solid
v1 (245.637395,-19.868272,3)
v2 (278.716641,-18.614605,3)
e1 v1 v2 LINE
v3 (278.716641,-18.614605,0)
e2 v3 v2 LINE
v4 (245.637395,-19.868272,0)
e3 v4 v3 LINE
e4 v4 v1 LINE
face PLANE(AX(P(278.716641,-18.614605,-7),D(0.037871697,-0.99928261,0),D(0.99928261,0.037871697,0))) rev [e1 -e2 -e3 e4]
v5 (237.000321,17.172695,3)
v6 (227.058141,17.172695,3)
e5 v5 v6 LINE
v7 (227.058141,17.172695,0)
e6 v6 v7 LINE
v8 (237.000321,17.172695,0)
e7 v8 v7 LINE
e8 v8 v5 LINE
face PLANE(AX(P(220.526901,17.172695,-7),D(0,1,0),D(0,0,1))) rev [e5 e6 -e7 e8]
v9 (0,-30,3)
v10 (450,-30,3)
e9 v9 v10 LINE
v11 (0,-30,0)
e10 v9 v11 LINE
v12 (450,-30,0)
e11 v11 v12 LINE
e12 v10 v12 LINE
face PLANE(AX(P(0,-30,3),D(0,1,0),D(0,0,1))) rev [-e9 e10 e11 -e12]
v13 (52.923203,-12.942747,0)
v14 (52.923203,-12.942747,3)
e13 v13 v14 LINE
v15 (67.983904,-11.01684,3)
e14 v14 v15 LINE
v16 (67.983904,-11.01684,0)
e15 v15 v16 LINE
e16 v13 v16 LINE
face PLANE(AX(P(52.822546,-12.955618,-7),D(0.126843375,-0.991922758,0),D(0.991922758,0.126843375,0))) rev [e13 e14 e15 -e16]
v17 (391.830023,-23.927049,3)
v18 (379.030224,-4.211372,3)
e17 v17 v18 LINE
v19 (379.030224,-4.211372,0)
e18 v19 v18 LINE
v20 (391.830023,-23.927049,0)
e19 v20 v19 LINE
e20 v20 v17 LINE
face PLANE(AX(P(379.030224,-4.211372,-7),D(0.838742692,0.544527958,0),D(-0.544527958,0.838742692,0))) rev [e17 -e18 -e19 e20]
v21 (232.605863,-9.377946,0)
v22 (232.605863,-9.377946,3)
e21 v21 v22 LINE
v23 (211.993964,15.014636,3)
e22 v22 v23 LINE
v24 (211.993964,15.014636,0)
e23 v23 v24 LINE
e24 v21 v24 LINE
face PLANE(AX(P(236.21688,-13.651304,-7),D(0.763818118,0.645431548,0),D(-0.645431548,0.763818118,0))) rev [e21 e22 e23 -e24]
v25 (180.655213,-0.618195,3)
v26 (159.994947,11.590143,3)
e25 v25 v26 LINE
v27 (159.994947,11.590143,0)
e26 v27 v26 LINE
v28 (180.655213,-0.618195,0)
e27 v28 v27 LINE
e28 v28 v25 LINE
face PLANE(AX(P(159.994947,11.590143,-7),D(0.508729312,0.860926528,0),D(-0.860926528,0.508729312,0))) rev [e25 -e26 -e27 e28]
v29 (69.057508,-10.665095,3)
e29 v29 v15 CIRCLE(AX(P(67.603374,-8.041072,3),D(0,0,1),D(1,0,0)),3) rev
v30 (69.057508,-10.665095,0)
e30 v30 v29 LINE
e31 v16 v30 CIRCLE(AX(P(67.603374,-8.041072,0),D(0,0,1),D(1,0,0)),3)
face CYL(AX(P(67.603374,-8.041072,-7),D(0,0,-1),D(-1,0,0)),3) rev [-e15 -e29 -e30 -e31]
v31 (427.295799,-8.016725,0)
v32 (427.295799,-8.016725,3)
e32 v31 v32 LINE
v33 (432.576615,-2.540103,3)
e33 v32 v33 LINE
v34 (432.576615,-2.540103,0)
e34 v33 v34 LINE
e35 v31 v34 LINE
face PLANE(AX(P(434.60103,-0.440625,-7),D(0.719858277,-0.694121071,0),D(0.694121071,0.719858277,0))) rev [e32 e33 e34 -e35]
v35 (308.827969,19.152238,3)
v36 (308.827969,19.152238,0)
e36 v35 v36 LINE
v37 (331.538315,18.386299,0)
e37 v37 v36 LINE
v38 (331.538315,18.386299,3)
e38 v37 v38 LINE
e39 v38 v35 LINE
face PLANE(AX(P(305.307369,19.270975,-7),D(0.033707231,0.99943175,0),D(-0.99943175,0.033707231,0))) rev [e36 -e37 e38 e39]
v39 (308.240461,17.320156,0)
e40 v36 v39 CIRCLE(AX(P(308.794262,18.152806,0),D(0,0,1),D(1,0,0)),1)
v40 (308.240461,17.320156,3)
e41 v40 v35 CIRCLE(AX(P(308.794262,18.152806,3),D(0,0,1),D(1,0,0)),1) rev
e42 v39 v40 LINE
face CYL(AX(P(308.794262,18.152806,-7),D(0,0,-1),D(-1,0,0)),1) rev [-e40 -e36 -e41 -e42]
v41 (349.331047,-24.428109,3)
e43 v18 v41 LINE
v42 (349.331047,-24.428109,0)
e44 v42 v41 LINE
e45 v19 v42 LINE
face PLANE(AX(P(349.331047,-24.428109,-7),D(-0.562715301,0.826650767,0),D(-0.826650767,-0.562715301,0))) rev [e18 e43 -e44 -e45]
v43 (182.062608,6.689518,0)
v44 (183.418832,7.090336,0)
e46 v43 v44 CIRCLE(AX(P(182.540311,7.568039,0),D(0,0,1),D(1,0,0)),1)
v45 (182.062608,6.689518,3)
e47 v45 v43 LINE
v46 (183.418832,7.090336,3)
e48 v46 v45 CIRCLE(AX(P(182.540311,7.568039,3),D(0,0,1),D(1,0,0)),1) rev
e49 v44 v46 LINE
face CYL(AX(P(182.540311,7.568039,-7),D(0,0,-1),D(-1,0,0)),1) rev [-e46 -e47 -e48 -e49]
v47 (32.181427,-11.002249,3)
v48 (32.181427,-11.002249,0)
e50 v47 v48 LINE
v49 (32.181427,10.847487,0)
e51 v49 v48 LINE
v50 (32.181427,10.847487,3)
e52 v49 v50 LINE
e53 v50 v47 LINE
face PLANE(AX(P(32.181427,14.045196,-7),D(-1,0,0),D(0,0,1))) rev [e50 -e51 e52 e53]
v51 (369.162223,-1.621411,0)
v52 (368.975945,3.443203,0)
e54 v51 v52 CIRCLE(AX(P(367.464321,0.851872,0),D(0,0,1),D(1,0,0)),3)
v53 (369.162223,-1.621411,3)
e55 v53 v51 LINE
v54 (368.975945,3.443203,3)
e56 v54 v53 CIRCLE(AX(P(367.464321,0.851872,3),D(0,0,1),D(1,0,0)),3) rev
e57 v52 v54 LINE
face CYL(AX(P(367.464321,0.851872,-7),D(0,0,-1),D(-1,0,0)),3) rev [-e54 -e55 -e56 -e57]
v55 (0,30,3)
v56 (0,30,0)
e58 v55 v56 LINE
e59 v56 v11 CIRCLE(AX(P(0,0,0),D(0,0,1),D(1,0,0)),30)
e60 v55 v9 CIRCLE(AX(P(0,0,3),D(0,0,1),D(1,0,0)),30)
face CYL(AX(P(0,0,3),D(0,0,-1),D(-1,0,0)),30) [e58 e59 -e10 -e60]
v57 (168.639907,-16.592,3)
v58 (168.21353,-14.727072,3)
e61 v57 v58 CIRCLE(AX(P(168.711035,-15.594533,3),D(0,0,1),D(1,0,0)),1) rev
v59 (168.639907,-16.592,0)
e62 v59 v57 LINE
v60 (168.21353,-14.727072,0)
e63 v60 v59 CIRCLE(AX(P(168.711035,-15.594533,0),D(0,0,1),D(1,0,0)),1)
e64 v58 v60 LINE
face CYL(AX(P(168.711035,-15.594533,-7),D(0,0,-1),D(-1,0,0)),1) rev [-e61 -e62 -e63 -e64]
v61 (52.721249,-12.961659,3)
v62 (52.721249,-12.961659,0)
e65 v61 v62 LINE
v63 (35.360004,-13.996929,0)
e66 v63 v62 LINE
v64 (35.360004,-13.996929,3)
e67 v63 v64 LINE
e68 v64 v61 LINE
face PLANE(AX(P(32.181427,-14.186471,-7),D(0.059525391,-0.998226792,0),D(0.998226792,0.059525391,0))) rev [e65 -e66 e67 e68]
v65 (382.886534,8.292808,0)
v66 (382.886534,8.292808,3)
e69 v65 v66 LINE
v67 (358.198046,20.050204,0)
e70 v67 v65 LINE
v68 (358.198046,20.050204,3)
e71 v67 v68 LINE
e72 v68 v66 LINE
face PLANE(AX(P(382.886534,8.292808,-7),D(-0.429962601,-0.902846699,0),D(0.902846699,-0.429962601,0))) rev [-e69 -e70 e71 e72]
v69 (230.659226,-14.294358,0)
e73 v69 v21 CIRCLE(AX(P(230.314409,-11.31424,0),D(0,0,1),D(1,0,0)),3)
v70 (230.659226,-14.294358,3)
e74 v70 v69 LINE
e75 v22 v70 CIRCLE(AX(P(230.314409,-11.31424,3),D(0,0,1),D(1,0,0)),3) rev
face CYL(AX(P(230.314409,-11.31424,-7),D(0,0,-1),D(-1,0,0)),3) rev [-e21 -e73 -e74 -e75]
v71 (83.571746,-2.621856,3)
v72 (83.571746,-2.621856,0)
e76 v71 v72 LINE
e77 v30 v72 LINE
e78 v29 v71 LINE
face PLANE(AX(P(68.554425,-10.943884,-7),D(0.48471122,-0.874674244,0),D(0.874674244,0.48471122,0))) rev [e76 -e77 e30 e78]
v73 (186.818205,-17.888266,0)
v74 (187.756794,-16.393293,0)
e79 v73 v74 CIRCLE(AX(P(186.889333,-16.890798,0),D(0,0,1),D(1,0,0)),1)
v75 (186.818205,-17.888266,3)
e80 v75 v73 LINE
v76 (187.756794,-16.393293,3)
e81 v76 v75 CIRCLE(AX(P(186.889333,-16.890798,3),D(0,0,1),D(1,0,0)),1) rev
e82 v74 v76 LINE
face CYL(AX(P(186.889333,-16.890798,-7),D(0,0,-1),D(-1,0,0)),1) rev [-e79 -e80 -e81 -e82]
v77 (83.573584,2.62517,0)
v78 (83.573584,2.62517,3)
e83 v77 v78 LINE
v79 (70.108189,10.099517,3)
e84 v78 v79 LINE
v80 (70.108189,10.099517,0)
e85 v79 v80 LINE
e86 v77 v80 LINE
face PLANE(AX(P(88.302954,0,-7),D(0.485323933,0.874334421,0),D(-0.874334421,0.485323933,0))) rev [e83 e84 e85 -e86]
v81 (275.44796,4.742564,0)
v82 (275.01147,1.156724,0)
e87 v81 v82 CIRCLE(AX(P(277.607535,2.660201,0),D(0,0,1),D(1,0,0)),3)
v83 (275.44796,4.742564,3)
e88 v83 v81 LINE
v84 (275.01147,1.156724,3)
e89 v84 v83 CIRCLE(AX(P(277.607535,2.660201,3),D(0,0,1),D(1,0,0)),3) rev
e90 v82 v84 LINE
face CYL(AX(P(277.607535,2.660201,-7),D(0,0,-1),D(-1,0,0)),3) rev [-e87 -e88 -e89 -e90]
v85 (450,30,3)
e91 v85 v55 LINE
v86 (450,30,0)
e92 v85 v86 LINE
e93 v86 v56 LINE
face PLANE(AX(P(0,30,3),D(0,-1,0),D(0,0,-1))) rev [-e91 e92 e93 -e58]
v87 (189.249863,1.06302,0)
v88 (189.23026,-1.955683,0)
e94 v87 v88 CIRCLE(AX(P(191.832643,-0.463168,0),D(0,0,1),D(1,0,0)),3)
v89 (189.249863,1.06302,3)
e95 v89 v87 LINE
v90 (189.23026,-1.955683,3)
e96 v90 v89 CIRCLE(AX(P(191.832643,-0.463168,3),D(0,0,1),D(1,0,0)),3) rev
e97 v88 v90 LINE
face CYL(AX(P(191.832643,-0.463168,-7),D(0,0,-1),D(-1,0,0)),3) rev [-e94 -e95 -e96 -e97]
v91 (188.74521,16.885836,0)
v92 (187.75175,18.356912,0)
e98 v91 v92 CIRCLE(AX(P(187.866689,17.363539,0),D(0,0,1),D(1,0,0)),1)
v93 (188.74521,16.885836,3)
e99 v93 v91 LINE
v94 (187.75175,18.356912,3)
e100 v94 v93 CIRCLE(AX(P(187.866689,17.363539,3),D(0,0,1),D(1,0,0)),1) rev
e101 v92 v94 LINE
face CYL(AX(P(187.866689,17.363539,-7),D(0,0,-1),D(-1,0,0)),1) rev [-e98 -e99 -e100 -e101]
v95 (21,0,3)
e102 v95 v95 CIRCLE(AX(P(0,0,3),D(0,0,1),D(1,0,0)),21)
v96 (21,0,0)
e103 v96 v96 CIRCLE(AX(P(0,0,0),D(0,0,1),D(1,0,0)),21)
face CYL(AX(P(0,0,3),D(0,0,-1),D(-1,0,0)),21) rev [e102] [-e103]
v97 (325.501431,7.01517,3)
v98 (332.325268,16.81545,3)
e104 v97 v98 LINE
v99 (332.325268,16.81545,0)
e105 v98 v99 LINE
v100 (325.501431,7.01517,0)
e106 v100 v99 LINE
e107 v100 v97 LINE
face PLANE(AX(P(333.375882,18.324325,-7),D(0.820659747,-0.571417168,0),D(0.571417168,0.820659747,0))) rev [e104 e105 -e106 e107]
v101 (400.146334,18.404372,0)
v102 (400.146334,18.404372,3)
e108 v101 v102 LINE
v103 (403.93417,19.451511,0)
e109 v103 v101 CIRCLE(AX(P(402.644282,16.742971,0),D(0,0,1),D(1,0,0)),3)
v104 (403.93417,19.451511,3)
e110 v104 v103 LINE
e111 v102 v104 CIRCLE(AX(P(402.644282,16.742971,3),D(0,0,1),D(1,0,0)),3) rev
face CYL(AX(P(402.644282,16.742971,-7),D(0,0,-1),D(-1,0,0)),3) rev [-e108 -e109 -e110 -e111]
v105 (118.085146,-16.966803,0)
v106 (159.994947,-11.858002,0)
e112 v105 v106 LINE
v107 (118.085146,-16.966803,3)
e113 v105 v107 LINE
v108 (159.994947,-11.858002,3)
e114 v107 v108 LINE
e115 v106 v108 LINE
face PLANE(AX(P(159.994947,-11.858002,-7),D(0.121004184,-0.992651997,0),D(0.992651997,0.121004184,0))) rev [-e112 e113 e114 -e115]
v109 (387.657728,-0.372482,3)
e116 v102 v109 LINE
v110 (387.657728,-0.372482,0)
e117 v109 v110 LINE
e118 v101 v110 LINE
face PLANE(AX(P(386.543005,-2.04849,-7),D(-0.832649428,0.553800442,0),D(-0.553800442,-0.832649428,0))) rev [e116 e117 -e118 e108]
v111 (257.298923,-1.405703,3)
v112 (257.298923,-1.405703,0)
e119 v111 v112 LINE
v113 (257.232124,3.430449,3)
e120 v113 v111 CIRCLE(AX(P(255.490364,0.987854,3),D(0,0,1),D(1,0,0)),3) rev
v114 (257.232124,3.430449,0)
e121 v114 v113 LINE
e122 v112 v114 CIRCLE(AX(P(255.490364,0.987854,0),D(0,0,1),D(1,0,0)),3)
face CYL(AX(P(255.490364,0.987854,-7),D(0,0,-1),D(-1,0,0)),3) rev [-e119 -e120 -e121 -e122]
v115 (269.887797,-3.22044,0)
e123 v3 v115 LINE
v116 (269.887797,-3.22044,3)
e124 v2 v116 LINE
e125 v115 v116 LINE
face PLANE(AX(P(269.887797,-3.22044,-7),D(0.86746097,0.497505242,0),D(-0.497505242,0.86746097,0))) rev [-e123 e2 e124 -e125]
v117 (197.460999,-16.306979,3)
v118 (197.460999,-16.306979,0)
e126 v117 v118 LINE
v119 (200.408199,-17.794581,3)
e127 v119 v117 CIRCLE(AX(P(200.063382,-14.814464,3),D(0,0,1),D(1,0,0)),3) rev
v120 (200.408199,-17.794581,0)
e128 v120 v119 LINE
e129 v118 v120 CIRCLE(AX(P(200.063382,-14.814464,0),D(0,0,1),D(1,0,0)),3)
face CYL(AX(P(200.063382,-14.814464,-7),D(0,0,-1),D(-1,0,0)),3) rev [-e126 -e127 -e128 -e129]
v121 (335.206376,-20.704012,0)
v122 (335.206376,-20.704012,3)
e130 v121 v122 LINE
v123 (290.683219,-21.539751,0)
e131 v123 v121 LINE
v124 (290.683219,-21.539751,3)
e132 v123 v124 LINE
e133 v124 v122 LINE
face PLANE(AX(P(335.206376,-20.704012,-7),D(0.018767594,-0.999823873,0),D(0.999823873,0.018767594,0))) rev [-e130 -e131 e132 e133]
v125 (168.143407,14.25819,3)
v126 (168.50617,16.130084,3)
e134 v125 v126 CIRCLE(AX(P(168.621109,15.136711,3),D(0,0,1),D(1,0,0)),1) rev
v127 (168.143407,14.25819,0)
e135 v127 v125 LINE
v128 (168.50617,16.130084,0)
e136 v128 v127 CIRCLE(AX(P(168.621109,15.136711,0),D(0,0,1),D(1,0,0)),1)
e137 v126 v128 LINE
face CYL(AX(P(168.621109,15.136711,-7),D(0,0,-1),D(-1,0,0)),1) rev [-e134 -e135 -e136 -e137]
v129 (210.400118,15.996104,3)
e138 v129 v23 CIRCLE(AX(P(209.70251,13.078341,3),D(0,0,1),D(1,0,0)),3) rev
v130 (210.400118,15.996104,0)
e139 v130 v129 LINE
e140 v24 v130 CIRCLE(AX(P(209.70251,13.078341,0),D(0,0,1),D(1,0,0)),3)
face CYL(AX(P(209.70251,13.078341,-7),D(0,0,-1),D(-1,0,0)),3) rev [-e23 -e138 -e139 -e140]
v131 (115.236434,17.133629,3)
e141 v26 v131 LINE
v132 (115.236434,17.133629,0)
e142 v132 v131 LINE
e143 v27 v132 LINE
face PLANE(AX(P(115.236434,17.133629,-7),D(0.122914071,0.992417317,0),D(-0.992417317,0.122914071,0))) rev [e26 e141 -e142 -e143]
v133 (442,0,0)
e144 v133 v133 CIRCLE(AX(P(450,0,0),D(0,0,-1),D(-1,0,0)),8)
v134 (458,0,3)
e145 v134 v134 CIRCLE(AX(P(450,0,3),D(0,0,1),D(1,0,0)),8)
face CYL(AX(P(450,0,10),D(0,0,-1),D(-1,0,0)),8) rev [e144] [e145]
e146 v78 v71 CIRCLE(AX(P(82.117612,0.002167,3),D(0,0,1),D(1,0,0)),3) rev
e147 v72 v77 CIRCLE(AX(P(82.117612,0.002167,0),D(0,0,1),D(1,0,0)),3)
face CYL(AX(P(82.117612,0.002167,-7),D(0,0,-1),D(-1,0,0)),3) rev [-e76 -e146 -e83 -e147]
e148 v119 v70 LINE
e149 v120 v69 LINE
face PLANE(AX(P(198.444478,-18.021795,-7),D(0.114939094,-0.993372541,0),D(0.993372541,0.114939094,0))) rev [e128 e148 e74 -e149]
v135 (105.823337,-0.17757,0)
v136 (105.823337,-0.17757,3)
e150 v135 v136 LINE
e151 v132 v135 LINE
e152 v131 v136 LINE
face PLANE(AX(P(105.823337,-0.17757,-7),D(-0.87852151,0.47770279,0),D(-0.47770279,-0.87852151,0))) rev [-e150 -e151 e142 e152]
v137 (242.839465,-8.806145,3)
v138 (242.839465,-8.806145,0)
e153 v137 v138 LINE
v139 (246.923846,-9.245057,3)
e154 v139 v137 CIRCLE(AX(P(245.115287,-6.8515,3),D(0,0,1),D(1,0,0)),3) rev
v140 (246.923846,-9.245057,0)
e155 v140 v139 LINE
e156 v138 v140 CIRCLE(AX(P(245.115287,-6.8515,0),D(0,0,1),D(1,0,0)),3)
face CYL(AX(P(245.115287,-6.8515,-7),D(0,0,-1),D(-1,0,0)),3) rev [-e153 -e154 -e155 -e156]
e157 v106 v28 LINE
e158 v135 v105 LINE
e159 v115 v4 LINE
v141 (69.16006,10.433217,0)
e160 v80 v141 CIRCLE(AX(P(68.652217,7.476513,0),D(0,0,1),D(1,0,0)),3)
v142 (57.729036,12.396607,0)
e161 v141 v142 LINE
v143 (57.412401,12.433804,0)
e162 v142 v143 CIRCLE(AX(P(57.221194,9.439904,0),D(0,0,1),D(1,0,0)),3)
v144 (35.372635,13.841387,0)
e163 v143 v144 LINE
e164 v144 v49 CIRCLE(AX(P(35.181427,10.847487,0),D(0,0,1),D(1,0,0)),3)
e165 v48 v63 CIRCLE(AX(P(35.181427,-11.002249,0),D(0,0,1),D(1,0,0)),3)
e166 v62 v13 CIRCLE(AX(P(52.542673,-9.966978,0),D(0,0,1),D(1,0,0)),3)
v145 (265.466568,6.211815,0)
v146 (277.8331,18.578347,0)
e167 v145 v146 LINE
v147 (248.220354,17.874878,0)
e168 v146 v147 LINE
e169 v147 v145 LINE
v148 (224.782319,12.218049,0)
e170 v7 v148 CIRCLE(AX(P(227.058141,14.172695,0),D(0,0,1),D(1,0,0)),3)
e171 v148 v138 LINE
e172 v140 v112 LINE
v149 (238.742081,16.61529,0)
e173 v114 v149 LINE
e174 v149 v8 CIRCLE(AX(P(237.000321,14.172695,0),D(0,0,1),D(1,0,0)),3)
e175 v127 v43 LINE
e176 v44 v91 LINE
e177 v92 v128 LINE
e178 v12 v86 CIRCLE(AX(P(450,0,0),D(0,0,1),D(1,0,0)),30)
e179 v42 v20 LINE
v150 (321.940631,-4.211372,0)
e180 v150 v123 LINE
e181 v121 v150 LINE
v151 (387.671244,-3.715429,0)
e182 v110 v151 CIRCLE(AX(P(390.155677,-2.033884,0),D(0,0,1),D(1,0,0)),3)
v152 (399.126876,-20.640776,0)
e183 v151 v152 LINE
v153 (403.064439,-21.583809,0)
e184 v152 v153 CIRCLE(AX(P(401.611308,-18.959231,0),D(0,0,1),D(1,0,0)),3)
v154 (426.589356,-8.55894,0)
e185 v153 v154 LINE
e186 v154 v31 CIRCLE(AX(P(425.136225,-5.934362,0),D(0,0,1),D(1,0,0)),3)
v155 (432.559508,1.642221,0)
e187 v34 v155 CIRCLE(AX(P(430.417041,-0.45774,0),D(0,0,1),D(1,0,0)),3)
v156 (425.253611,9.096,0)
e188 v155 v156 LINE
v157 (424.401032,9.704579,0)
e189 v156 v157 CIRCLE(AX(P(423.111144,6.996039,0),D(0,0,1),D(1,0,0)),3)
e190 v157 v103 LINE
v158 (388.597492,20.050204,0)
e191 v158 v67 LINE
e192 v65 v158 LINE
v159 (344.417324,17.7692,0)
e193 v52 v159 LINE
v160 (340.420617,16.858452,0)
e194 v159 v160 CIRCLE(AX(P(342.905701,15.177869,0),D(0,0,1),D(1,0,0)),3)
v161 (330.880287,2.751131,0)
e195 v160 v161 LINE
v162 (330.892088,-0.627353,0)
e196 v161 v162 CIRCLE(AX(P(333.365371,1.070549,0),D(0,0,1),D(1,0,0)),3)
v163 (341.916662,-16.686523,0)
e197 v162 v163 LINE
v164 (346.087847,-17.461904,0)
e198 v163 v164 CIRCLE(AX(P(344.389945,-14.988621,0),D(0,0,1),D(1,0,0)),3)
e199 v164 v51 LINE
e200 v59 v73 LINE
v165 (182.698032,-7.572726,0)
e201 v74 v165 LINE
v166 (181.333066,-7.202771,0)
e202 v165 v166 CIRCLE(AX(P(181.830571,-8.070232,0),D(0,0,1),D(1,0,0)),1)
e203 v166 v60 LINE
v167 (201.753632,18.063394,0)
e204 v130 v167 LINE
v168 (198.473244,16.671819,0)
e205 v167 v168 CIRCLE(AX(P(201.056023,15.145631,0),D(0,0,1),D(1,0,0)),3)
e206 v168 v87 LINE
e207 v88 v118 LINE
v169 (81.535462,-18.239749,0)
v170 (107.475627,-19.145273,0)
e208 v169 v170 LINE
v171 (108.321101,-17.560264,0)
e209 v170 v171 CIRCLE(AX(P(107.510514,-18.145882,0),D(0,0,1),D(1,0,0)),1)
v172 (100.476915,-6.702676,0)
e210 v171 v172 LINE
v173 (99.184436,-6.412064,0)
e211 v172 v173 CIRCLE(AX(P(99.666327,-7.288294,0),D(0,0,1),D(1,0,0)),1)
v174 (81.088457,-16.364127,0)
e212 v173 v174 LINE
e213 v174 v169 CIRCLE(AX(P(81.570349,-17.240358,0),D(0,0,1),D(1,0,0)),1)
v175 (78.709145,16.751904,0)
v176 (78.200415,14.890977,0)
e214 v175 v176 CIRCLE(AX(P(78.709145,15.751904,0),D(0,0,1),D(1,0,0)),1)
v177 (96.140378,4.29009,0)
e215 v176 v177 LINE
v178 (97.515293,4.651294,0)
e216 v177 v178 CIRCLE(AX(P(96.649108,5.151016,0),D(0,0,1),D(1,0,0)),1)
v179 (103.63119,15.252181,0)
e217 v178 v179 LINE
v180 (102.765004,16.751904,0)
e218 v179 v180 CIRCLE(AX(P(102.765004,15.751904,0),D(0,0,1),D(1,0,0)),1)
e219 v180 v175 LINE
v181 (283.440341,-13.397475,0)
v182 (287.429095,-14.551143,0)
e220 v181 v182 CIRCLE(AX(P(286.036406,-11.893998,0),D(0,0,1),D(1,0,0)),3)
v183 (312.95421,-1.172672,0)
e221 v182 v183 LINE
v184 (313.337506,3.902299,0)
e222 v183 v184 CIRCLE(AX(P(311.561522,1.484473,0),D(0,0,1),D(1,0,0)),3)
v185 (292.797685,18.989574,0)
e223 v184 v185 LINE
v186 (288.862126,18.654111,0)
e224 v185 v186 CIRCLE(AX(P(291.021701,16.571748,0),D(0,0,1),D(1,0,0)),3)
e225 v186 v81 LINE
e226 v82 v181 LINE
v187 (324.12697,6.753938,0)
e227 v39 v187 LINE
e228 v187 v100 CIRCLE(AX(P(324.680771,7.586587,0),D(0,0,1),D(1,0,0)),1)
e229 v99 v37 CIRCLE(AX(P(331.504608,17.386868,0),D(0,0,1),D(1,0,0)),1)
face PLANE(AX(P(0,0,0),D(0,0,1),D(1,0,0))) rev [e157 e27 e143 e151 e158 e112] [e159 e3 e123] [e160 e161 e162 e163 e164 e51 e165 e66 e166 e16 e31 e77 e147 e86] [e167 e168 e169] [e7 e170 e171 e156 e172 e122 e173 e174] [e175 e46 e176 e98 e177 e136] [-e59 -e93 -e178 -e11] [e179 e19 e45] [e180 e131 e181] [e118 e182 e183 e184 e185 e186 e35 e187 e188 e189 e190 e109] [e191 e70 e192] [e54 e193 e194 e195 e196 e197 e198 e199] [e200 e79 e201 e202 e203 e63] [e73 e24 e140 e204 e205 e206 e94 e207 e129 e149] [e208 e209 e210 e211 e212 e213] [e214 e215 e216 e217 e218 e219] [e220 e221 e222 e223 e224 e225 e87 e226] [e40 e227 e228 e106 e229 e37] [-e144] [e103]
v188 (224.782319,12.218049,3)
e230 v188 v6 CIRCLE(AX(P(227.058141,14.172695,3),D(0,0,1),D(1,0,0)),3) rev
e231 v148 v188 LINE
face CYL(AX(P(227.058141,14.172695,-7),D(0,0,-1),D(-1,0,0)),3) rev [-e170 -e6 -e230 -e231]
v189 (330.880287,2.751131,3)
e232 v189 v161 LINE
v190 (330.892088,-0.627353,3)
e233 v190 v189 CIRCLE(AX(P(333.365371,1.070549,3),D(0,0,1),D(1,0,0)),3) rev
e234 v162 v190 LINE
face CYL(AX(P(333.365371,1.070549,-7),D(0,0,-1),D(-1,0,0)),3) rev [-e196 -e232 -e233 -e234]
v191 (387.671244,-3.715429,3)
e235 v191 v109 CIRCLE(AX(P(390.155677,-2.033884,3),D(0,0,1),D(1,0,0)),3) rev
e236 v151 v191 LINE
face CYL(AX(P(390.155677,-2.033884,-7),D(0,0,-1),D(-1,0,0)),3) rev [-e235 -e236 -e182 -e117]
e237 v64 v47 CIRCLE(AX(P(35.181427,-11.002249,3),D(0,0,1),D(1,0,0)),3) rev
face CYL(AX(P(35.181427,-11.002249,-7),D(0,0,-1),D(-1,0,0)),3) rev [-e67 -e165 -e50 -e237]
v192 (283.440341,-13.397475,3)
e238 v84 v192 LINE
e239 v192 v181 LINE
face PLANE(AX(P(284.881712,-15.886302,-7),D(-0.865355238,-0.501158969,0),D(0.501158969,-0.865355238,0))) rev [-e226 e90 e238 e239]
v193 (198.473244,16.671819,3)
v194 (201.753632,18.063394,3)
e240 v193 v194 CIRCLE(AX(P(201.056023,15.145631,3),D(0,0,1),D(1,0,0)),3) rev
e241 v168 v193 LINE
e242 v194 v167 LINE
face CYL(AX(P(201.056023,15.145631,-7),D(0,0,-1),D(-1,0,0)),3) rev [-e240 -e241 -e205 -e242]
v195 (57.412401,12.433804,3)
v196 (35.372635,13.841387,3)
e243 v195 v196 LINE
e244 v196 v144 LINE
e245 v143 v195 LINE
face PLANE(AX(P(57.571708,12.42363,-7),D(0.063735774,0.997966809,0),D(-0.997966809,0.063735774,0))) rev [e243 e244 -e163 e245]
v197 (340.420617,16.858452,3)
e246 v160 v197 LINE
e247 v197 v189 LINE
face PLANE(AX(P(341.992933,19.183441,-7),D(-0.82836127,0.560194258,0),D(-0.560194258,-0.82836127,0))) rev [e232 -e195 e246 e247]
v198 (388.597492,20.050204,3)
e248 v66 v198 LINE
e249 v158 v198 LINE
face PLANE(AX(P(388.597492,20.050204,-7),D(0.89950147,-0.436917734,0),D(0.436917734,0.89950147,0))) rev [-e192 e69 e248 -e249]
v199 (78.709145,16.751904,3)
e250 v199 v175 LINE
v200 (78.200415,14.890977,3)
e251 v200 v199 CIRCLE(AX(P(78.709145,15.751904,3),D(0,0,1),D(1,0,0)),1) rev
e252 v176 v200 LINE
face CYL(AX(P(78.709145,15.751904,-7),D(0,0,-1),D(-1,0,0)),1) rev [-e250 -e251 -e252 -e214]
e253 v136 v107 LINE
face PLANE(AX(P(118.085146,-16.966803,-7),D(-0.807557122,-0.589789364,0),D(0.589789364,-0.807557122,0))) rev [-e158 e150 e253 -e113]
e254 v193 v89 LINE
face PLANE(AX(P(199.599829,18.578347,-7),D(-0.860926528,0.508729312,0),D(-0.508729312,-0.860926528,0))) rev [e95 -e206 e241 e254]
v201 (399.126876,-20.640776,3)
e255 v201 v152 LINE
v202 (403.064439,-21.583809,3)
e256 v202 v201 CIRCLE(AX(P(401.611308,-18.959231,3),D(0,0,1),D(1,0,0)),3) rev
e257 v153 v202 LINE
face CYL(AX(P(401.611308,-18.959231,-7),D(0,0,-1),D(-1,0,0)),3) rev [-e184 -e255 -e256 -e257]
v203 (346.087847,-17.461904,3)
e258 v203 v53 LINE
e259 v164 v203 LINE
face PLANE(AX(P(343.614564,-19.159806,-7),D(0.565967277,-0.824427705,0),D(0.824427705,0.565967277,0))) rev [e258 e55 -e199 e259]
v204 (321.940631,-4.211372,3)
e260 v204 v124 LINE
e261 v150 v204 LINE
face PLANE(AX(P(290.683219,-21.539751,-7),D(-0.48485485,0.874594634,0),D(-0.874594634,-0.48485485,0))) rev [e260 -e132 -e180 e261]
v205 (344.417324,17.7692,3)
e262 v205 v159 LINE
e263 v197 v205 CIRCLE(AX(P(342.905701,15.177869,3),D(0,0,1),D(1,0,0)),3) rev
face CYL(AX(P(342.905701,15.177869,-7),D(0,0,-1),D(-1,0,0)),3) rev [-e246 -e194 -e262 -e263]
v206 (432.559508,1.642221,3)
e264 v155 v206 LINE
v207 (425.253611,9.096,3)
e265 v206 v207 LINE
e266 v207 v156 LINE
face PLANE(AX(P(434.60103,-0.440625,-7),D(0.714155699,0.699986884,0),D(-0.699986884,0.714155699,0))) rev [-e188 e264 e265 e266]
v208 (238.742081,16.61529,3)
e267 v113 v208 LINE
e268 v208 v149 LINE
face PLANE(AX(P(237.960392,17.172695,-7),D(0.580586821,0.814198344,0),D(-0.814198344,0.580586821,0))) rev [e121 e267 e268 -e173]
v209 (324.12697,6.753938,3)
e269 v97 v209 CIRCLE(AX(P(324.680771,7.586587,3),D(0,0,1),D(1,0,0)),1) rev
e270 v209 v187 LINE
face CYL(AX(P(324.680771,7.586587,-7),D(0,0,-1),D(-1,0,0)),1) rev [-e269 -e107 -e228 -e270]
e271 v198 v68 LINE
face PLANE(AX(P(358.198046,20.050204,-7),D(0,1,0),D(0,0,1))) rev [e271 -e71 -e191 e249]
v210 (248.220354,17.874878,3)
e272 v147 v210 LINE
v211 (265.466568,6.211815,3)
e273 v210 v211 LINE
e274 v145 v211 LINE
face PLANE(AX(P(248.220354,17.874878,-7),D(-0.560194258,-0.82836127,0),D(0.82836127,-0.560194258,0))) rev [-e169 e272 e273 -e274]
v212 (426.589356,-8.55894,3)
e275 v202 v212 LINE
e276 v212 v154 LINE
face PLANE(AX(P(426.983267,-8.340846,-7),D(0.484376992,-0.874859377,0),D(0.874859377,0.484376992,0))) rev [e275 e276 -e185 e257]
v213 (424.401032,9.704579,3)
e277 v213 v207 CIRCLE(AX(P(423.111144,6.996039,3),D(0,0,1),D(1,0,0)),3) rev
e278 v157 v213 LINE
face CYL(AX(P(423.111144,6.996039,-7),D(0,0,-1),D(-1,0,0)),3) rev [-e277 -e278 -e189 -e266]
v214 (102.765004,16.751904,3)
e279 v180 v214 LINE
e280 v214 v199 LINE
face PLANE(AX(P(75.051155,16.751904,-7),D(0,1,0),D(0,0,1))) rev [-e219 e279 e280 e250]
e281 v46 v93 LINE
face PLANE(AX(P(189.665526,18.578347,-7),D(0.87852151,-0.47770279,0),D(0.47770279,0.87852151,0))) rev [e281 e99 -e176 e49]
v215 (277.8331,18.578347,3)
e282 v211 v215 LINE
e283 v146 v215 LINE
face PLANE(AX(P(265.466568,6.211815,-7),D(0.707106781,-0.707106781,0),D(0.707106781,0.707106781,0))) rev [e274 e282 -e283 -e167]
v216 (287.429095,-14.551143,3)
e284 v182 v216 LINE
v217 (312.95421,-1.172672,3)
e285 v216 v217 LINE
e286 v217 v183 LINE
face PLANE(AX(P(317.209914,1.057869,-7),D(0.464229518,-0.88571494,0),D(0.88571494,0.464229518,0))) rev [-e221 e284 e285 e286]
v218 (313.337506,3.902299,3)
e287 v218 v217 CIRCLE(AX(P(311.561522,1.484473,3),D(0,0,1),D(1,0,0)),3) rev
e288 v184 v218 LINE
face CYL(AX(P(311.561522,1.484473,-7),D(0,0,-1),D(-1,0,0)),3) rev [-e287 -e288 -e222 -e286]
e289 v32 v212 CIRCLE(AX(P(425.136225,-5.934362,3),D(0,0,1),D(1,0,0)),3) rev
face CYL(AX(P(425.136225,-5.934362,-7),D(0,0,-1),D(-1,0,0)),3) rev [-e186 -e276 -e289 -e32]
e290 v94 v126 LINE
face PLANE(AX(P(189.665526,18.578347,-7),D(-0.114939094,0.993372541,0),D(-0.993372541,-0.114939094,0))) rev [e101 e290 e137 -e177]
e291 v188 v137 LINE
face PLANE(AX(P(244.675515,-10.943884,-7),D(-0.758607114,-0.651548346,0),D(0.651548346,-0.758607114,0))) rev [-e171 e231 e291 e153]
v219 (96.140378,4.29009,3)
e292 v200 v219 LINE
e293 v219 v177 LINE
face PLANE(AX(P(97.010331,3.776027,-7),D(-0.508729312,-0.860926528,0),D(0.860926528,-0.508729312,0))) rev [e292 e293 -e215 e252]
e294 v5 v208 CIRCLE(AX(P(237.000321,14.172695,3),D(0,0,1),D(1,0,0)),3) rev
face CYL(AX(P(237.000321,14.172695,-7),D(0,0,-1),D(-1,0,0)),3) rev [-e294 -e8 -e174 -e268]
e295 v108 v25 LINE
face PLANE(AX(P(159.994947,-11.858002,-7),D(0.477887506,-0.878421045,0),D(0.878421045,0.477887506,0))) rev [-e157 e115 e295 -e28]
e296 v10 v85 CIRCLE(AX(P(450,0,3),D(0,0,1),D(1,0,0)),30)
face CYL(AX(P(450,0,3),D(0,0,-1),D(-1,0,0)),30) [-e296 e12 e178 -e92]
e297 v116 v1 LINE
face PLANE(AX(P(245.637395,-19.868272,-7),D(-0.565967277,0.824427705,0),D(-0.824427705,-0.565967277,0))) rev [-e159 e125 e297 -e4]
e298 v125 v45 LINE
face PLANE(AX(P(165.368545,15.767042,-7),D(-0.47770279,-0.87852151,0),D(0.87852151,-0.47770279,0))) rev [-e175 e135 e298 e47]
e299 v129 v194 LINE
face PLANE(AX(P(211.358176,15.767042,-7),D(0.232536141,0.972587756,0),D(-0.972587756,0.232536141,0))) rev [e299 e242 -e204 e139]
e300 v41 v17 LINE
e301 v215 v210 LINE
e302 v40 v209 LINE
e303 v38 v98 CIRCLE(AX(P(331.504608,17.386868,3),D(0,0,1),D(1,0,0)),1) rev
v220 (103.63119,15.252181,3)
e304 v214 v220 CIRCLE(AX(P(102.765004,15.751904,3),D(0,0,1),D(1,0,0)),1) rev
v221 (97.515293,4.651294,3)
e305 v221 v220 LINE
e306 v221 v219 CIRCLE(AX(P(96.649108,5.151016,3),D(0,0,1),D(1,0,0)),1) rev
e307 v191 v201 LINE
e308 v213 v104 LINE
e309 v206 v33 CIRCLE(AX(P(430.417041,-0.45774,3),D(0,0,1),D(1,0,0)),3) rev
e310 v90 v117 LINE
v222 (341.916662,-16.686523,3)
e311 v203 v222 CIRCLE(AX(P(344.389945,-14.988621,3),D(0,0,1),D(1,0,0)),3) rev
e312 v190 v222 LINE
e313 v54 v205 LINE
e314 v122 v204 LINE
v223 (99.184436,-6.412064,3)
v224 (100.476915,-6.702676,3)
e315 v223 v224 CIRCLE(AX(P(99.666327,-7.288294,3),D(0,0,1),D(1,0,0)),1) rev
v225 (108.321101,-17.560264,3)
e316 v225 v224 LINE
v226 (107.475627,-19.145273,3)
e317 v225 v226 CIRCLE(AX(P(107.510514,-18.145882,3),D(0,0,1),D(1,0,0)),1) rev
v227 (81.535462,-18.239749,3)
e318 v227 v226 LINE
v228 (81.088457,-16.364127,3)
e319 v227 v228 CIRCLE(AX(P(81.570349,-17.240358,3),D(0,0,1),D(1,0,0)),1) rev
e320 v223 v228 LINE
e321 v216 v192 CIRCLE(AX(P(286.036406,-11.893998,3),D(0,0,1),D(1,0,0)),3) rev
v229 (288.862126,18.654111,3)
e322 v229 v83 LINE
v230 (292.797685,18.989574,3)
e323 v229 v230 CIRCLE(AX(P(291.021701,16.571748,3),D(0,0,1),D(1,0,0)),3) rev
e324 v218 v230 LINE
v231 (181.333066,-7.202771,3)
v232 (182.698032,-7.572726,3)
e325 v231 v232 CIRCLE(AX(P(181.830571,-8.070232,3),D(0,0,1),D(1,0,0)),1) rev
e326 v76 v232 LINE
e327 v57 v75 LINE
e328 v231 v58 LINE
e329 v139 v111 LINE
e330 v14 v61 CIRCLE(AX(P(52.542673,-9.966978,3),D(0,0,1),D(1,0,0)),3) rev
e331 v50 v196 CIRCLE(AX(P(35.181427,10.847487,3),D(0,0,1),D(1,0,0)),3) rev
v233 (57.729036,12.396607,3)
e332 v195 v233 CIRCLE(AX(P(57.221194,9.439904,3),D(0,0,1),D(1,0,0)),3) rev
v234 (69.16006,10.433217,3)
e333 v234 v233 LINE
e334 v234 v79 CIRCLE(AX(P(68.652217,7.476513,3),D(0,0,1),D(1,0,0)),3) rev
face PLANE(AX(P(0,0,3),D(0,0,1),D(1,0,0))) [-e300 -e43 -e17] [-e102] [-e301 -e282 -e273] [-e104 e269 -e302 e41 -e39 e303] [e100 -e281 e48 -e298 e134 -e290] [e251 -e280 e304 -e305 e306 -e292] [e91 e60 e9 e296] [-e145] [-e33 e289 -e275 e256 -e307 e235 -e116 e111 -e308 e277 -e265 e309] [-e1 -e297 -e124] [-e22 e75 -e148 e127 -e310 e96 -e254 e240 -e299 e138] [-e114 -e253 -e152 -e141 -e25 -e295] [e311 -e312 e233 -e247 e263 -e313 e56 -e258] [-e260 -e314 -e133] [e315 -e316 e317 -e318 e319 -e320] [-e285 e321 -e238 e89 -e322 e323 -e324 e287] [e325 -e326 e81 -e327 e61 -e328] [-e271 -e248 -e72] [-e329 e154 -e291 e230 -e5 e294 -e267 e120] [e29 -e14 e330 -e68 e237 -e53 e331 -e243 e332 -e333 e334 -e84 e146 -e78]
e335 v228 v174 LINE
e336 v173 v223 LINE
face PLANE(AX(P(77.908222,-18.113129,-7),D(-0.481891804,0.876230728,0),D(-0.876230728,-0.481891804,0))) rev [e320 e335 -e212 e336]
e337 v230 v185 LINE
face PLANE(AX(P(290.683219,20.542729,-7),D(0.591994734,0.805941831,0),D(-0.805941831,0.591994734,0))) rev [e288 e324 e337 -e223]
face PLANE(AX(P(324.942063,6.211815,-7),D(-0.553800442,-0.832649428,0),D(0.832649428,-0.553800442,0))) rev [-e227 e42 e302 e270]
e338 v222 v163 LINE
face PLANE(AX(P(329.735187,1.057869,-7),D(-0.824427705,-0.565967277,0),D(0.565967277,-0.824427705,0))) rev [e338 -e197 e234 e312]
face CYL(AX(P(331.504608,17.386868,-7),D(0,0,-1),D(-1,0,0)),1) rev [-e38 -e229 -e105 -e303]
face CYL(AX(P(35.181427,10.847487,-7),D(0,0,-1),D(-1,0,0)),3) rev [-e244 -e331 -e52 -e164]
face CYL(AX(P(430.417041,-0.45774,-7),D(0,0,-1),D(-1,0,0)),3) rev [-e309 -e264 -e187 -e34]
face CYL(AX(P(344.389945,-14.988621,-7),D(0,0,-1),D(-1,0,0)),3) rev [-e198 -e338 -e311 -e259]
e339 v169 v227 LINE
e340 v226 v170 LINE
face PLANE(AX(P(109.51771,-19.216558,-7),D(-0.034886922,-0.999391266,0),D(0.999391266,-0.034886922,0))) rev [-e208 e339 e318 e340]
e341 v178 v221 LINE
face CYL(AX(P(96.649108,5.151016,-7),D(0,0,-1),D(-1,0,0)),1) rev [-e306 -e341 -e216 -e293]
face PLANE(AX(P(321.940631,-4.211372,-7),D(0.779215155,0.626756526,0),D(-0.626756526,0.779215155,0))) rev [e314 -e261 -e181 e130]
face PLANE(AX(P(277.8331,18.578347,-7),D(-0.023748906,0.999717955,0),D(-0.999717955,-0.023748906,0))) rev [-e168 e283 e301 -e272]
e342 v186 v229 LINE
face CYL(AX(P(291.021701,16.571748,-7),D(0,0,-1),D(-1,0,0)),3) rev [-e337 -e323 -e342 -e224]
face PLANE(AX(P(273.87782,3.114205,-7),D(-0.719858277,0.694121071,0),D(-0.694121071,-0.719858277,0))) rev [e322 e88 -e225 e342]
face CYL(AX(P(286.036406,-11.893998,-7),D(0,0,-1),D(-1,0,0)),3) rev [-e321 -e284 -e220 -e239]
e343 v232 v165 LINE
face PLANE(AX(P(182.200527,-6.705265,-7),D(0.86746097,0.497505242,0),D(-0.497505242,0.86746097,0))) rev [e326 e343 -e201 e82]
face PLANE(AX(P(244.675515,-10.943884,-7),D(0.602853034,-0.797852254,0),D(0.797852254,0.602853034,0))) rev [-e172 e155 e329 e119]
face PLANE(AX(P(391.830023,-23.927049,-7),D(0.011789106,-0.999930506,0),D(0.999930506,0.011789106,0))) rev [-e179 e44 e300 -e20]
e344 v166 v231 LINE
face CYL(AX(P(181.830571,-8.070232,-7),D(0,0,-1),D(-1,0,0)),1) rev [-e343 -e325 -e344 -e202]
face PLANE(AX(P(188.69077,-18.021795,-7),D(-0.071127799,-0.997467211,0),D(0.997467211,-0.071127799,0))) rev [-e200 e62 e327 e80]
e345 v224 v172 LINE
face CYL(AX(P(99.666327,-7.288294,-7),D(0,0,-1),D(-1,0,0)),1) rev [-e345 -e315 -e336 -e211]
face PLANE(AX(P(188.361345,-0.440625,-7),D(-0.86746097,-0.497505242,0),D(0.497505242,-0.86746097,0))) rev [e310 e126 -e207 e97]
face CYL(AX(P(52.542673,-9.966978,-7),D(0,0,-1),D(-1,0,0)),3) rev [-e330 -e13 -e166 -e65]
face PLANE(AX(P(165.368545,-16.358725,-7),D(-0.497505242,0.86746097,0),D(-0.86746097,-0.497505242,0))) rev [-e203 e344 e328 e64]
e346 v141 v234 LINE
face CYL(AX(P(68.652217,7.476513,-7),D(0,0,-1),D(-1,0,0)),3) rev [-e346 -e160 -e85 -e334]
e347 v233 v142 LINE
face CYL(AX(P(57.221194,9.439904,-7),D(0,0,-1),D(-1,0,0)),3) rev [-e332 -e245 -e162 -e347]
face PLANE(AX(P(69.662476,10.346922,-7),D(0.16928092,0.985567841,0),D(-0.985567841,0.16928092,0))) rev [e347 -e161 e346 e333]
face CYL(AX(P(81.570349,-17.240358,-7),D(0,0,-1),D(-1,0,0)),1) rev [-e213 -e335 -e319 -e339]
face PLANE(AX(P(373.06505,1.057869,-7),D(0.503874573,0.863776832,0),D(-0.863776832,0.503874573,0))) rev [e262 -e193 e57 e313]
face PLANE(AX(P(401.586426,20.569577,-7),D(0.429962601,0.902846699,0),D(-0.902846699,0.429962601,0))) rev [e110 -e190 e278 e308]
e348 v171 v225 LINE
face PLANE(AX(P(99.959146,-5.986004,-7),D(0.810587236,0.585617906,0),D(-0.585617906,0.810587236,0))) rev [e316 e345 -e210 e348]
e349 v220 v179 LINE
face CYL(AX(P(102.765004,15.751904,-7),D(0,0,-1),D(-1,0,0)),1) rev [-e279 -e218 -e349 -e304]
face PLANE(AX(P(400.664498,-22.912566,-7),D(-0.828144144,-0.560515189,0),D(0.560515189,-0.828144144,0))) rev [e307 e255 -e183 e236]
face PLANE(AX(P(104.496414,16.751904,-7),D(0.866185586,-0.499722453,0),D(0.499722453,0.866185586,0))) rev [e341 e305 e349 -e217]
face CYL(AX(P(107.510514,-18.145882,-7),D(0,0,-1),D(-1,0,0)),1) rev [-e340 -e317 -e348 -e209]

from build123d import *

# Parameters (mm, degrees)
SKETCH1_R           = 21
BOSS_EXTRUDE1_DEPTH = 3
SKETCH2_R           = 8
CUT_EXTRUDE1_DEPTH  = 10
CUT_EXTRUDE2_DEPTH  = 10
FILLET1_R           = 3
FILLET2_R           = 1
FILLET3_R           = 3


with BuildPart() as part:
    # Sketch1 → Boss-Extrude1 (new body)
    with BuildSketch(Plane.XY):
        with BuildLine():
            Line((0, 30), (450, 30))
            ThreePointArc((450, 30), (480, 0), (450, -30))
            Line((450, -30), (0, -30))
            ThreePointArc((0, -30), (-30, 0), (0, 30))
        make_face()
        Circle(SKETCH1_R, mode=Mode.SUBTRACT)
    extrude(amount=BOSS_EXTRUDE1_DEPTH)

    # Sketch2 → Cut-Extrude1 (cut)
    with BuildSketch(Plane(origin=(0, 0, 0), x_dir=(-1, 0, 0), z_dir=(0, 0, -1))):
        with Locations((-450, 0)):
            Circle(SKETCH2_R)
    extrude(amount=-CUT_EXTRUDE1_DEPTH, mode=Mode.SUBTRACT)

    # Sketch4 → Cut-Extrude2 (cut)
    with BuildSketch(Plane.XY.offset(3)):
        Polygon((75.051155, 16.751903708), (104.496414244, 16.751903708), (97.010331386, 3.776026753), align=None)
        Polygon((115.236434087, 17.133628969), (159.994947493, 11.590143364), (180.655213039, -0.618195368), (159.994947493, -11.858002091), (118.085145684, -16.966802955), (105.823337098, -0.177570288), align=None)
        Polygon((189.665526052, 18.578346929), (182.941129647, 6.211814834), (165.368544986, 15.767042135), align=None)
        Polygon((199.599828734, 18.578346929), (188.361345274, -0.440625079), (198.44447832, -18.021795356), (236.21688029, -13.651304452), (211.35817569, 15.767042135), align=None)
        Polygon((220.526900823, 17.172694532), (237.960392272, 17.172694532), (260.559362669, 1.057868841), (244.675514904, -10.943884315), align=None)
        Polygon((265.46656767, 6.211814834), (277.833099766, 18.578346929), (248.220353812, 17.874878196), align=None)
        Polygon((165.368544986, -16.358724589), (182.200526719, -6.705265316), (188.690770328, -18.021795356), align=None)
        Polygon((245.637394842, -19.868271823), (269.887796501, -3.220439984), (278.716640894, -18.61460526), align=None)
        Polygon((290.68321902, -21.539751298), (321.940631216, -4.211371592), (335.206376445, -20.70401156), align=None)
        Polygon((341.992933025, 19.183441398), (329.735187473, 1.057868841), (343.614563911, -19.159806148), (373.065049946, 1.057868841), align=None)
        Polygon((273.877820417, 3.11420529), (290.68321902, 20.542728609), (317.209913689, 1.057868841), (284.881711611, -15.886302486), align=None)
        Polygon((305.30736893, 19.270974689), (333.375882047, 18.324324896), (324.94206251, 6.211814834), align=None)
        Polygon((358.198045962, 20.050204211), (388.597492455, 20.050204211), (382.886534474, 8.292807575), align=None)
        Polygon((349.331047186, -24.428108969), (379.030224427, -4.211371592), (391.830023208, -23.92704923), align=None)
        Polygon((386.543005003, -2.048490112), (401.586425759, 20.569577221), (424.881274354, 9.475873595), (434.601030173, -0.440625079), (426.98326683, -8.340846264), (400.664497987, -22.912566492), align=None)
        Polygon((77.908222084, -18.113128875), (99.959146412, -5.986003719), (109.517710051, -19.216558315), align=None)
        Polygon((32.181427401, 14.045195837), (32.181427401, -14.186471438), (52.8225456, -12.955618238), (68.554424875, -10.943884315), (88.302954178, 0), (69.662476286, 10.346921974), (57.571708379, 12.423629667), align=None)
    extrude(amount=-CUT_EXTRUDE2_DEPTH, mode=Mode.SUBTRACT)

    # Fillet1
    # the kernel refuses this fillet: 3 mm, written as the material it adds along each edge
    with BuildSketch(Plane(origin=(32.181427401, 14.045195837, 3), x_dir=(0, -1, 0), z_dir=(0, 0, -1))) as fillet1_piece_1:
        with BuildLine():
            CenterArc((FILLET1_R * 1.06590295895, -FILLET1_R), FILLET1_R, 90, 93.654267812)
            Line((FILLET1_R * 0.0679361503378, -FILLET1_R * 1.06373577423), (0, 0))
            Line((0, 0), (FILLET1_R * 1.06590295895, 0))
        make_face()
    extrude(amount=3)
    with BuildSketch(Plane(origin=(57.571708379, 12.423629667, 3), x_dir=(-0.9979668086083109, 0.06373577422564991, 0), z_dir=(0, 0, -1))) as fillet1_piece_2:
        with BuildLine():
            CenterArc((FILLET1_R * 0.0532106389046, -FILLET1_R), FILLET1_R, 90, 6.091745071)
            Line((-FILLET1_R * 0.0529101714038, -FILLET1_R * 0.00564675611758), (0, 0))
            Line((0, 0), (FILLET1_R * 0.0532106389046, 0))
        make_face()
    extrude(amount=3)
    with BuildSketch(Plane(origin=(69.662476286, 10.346921974, 3), x_dir=(-0.9855678414202016, 0.16928092024302194, 0), z_dir=(0, 0, -1))) as fillet1_piece_3:
        with BuildLine():
            CenterArc((FILLET1_R * 0.169924527084, -FILLET1_R), FILLET1_R, 90, 19.287684891)
            Line((-FILLET1_R * 0.160386998178, -FILLET1_R * 0.0561280297205), (0, 0))
            Line((0, 0), (FILLET1_R * 0.169924527084, 0))
        make_face()
    extrude(amount=3)
    with BuildSketch(Plane(origin=(88.302954178, 0, 3), x_dir=(-0.8743344213622383, 0.48532393266885154, 0), z_dir=(0, 0, -1))) as fillet1_piece_4:
        with BuildLine():
            CenterArc((FILLET1_R * 1.80303637433, -FILLET1_R), FILLET1_R, 90, 121.972748141)
            Line((FILLET1_R * 0.954736326134, -FILLET1_R * 1.52951584323), (0, 0))
            Line((0, 0), (FILLET1_R * 1.80303637433, 0))
        make_face()
    extrude(amount=3)
    with BuildSketch(Plane(origin=(68.554424875, -10.943884315, 3), x_dir=(0.8746742438686059, 0.4847112203290558, 0), z_dir=(0, 0, -1))) as fillet1_piece_5:
        with BuildLine():
            CenterArc((FILLET1_R * 0.191722072286, -FILLET1_R), FILLET1_R, 90, 21.70633324)
            Line((-FILLET1_R * 0.178127385219, -FILLET1_R * 0.0709083044269), (0, 0))
            Line((0, 0), (FILLET1_R * 0.191722072286, 0))
        make_face()
    extrude(amount=3)
    with BuildSketch(Plane(origin=(52.8225456, -12.955618238, 3), x_dir=(0.9919227581955331, 0.1268433749699441, 0), z_dir=(0, 0, -1))) as fillet1_piece_6:
        with BuildLine():
            CenterArc((FILLET1_R * 0.0338255904119, -FILLET1_R), FILLET1_R, 90, 3.874649837)
            Line((-FILLET1_R * 0.0337482743847, -FILLET1_R * 0.00228572587316), (0, 0))
            Line((0, 0), (FILLET1_R * 0.0338255904119, 0))
        make_face()
    extrude(amount=3)
    with BuildSketch(Plane(origin=(32.181427401, -14.186471438, 3), x_dir=(0, 1, 0), z_dir=(0, 0, -1))) as fillet1_piece_7:
        with BuildLine():
            CenterArc((FILLET1_R * 1.06140748795, FILLET1_R), FILLET1_R, 176.587428992, 93.412571008)
            Line((FILLET1_R * 0.0631806961919, FILLET1_R * 1.05952539143), (0, 0))
            Line((0, 0), (FILLET1_R * 1.06140748795, 0))
        make_face()
    extrude(amount=3)

    # Fillet2
    fillet2_edges = [part.edges().sort_by_distance(p)[0] for p in [
        (188.690770328, -18.021795356, 1.5),
        (165.368544986, -16.358724589, 1.5),
        (182.200526719, -6.705265316, 1.5),
        (97.010331386, 3.776026753, 1.5),
        (75.051155, 16.751903708, 1.5),
        (104.496414244, 16.751903708, 1.5),
        (165.368544986, 15.767042135, 1.5),
        (189.665526052, 18.578346929, 1.5),
        (182.941129647, 6.211814834, 1.5),
        (109.517710051, -19.216558315, 1.5),
        (77.908222084, -18.113128875, 1.5),
        (99.959146412, -5.986003719, 1.5),
        (324.94206251, 6.211814834, 1.5),
        (305.30736893, 19.270974689, 1.5),
        (333.375882047, 18.324324896, 1.5),
    ]]
    fillet(fillet2_edges, radius=FILLET2_R)

    # Fillet3
    fillet3_edges = [part.edges().sort_by_distance(p)[0] for p in [
        (199.599828734, 18.578346929, 1.5),
        (211.35817569, 15.767042135, 1.5),
        (236.21688029, -13.651304452, 1.5),
        (198.44447832, -18.021795356, 1.5),
        (188.361345274, -0.440625079, 1.5),
        (400.664497987, -22.912566492, 1.5),
        (386.543005003, -2.048490112, 1.5),
        (401.586425759, 20.569577221, 1.5),
        (424.881274354, 9.475873595, 1.5),
        (434.601030173, -0.440625079, 1.5),
        (426.98326683, -8.340846264, 1.5),
        (341.992933025, 19.183441398, 1.5),
        (373.065049946, 1.057868841, 1.5),
        (343.614563911, -19.159806148, 1.5),
        (329.735187473, 1.057868841, 1.5),
        (284.881711611, -15.886302486, 1.5),
        (273.877820417, 3.11420529, 1.5),
        (290.68321902, 20.542728609, 1.5),
        (317.209913689, 1.057868841, 1.5),
        (244.675514904, -10.943884315, 1.5),
        (220.526900823, 17.172694532, 1.5),
        (237.960392272, 17.172694532, 1.5),
        (260.559362669, 1.057868841, 1.5),
    ]]
    fillet(fillet3_edges, radius=FILLET3_R)


solid = part.part
